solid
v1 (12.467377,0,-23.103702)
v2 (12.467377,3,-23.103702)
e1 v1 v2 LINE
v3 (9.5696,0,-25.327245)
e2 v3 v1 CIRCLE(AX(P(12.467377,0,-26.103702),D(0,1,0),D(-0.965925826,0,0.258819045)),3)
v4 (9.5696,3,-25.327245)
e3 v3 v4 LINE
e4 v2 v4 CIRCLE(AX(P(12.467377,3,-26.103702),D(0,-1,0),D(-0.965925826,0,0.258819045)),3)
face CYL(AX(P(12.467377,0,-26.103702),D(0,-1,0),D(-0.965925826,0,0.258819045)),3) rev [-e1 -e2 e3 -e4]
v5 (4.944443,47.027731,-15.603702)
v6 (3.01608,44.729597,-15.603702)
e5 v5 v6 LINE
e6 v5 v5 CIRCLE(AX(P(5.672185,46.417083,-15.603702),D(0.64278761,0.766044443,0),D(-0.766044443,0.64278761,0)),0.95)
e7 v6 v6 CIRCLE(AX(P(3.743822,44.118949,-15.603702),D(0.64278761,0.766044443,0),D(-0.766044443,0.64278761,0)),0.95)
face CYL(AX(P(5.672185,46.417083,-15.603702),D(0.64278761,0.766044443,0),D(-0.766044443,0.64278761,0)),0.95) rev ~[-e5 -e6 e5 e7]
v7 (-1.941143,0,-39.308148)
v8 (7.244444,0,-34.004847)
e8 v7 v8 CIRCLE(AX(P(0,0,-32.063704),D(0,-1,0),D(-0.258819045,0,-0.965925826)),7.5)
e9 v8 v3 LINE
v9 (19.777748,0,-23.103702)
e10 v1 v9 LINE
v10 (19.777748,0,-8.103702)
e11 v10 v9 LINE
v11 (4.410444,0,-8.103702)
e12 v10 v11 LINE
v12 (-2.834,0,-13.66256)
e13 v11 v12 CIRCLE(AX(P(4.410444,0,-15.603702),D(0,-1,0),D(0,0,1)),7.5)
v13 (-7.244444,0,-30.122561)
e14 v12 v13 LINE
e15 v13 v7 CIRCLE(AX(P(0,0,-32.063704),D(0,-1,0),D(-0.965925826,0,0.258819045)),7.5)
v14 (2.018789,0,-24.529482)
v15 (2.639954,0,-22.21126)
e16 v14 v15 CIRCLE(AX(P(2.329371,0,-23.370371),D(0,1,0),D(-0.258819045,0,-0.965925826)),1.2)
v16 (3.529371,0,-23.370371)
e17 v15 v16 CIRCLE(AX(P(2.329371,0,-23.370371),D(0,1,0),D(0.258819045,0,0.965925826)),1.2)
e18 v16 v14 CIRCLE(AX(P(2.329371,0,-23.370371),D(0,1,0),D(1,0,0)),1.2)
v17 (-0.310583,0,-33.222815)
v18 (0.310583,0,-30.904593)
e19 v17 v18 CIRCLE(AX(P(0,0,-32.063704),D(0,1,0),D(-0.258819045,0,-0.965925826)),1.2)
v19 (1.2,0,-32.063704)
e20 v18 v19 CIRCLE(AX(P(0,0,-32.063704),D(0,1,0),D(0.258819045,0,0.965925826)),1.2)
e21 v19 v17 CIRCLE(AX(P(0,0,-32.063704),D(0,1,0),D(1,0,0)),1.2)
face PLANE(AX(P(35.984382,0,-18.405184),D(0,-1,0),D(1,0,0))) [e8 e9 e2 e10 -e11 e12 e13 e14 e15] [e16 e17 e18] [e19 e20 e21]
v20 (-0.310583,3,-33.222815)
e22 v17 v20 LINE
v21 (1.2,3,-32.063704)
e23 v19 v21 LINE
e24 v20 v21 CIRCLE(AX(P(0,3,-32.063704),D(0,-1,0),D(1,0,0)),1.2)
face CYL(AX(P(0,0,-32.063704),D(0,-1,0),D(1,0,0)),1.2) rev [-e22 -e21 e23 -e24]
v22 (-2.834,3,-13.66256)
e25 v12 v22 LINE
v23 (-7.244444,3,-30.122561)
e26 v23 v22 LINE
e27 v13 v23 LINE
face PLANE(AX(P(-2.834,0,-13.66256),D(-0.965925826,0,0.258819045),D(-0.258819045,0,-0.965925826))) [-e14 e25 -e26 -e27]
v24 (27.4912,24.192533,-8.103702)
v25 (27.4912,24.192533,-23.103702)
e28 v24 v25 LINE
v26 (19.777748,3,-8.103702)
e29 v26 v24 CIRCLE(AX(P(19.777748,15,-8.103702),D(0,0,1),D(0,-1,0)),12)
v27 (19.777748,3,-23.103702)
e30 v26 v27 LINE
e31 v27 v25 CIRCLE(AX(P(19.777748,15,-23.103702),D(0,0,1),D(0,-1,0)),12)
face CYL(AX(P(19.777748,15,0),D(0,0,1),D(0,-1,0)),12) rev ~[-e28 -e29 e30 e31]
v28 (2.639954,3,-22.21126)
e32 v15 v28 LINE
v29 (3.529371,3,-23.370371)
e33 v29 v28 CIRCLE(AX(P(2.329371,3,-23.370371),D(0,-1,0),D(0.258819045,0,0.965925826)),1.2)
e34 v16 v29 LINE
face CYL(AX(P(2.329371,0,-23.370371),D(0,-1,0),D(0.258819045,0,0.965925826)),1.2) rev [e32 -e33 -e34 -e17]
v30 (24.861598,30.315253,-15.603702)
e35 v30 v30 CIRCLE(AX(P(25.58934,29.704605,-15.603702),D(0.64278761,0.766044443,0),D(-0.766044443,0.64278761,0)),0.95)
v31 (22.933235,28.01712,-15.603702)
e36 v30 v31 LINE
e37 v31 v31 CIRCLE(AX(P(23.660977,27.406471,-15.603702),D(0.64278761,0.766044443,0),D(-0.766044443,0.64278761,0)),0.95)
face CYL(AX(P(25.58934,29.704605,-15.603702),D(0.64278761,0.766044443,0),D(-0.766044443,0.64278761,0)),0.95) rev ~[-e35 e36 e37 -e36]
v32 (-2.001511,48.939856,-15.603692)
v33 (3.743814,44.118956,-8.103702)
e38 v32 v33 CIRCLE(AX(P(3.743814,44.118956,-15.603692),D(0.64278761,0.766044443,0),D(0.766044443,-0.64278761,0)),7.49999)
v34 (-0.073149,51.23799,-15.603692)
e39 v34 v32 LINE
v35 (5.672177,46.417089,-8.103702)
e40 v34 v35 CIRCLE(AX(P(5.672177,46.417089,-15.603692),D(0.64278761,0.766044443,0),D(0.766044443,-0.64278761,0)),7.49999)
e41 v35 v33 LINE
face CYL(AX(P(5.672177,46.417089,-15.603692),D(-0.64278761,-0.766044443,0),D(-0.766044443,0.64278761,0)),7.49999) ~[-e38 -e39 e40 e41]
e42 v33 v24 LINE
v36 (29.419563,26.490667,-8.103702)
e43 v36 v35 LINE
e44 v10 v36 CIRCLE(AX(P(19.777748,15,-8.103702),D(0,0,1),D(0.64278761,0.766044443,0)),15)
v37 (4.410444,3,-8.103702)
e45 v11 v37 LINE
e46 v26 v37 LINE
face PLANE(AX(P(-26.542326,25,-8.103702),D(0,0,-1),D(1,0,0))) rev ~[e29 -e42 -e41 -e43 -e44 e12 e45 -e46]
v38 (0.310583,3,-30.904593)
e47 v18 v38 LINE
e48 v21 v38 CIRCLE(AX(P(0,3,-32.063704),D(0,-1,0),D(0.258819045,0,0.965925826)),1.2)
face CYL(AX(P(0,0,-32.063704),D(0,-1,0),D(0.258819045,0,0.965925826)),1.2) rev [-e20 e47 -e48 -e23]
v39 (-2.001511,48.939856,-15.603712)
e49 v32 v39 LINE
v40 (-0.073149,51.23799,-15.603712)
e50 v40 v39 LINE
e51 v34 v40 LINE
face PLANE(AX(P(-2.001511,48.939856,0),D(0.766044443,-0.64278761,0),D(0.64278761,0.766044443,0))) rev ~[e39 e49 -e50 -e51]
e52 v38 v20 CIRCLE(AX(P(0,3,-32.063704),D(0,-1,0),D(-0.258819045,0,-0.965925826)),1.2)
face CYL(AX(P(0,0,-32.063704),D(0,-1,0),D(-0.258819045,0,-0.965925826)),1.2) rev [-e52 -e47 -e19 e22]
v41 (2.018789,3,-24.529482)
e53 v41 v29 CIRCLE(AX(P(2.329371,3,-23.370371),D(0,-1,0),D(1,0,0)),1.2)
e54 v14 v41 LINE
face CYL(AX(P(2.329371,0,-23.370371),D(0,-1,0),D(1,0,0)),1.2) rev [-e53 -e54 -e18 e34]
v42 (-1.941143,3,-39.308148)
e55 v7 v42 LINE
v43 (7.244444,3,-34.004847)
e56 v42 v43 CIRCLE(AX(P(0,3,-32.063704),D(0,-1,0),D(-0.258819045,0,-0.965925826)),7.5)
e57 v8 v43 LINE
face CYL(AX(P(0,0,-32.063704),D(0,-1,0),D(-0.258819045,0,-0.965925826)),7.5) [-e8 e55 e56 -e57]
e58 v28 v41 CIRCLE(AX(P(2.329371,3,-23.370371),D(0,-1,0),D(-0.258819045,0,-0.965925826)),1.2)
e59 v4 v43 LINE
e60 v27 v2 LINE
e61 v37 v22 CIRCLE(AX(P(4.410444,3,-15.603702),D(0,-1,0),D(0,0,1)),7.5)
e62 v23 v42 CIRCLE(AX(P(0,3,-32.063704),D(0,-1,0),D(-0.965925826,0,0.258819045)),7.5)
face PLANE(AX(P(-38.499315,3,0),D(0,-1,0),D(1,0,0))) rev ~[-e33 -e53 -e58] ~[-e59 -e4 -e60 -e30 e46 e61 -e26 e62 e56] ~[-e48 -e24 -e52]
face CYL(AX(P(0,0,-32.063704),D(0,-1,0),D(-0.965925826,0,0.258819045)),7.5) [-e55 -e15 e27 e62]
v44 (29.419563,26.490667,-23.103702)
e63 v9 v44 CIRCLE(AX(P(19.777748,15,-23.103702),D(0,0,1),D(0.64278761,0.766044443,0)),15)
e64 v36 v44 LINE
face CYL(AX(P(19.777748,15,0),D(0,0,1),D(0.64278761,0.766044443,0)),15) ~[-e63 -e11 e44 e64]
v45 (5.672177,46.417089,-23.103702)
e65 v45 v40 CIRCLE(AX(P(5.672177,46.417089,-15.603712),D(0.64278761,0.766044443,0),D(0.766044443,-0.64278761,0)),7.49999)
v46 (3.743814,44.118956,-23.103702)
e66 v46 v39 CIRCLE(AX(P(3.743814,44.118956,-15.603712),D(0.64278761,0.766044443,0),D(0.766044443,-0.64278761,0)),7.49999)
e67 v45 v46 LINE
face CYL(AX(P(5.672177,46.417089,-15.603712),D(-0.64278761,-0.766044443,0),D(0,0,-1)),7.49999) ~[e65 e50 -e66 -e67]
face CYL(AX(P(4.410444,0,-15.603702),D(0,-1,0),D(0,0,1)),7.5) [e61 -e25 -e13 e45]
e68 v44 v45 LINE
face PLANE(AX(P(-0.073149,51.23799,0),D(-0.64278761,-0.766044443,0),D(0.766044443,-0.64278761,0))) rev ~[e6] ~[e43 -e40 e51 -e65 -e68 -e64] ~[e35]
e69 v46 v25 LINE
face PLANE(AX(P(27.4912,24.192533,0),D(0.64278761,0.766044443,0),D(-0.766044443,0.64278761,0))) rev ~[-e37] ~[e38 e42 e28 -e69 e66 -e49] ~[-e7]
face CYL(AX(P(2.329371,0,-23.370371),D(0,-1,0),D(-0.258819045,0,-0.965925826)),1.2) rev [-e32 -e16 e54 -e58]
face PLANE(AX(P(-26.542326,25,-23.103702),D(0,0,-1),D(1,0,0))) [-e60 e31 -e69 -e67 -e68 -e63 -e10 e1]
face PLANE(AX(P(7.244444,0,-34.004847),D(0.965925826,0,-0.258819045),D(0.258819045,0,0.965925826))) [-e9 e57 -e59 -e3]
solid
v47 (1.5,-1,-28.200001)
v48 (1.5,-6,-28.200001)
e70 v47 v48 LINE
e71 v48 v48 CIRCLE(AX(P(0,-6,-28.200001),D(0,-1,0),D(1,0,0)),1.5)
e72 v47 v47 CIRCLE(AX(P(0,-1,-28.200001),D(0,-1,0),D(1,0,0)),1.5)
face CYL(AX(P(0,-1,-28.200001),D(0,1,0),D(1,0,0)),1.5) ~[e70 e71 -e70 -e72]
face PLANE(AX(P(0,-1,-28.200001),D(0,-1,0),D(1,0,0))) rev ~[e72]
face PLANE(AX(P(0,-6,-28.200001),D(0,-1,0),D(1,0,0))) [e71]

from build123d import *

# Parameters (mm, degrees)
F3_R      = 1.5
F4_DEPTH  = 5
F1_R      = 2.15
F5_DEPTH  = 25
F7_W      = 88.294127956
F7_H      = 15
F8_DEPTH  = 50
F0_W      = 181.6474571824
F0_H      = 159.0860895813
F9_DEPTH  = 39.5647038297
F10_R     = 0.95
F11_DEPTH = 5
F12_R     = 7.49999


# Not quite as in the source:
# - a fillet or chamfer is up to 0.001 mm smaller than in the source, because OpenCascade refuses the exact size


with BuildPart() as f4:
    # F3 (on offset) → F4 (new body)
    with BuildSketch(Plane.XZ.offset(1)):
        with Locations((0, -28.2000005245)):
            Circle(F3_R)
    extrude(amount=F4_DEPTH)


with BuildPart() as f5:
    # F1 (on Front) → F5 (new body)
    with BuildSketch(Plane.XZ):
        with BuildLine():
            ThreePointArc((-1.9411428383, -39.3081475268), (3.75, -38.5588943581), (7.2444436972, -34.0048466679))
            Line((7.2444436972, -34.0048466679), (9.5695999627, -25.3272453493))
            ThreePointArc((9.5695999627, -25.3272453493), (10.6410931546, -23.7236424637), (12.4673774416, -23.1037024846))
            Line((12.4673774416, -23.1037024846), (80.0844150527, -23.1037024846))
            ThreePointArc((80.0844150527, -23.1037024846), (87.5844150527, -15.6037024846), (80.0844150527, -8.1037024846))
            Line((80.0844150527, -8.1037024846), (49.0844150527, -8.1037024846))
            Line((49.0844150527, -8.1037024846), (19.777748386, -8.1037024846))
            Line((19.777748386, -8.1037024846), (4.4104440678, -8.1037024846))
            ThreePointArc((4.4104440678, -8.1037024846), (-0.1552666497, -9.6535524324), (-2.8339996293, -13.6625596463))
            Line((-2.8339996293, -13.6625596463), (-7.2444436972, -30.1225609914))
            ThreePointArc((-7.2444436972, -30.1225609914), (-6.4951905284, -35.8137038297), (-1.9411428383, -39.3081475268))
        make_face()
        with BuildLine():
            ThreePointArc((1.2, -32.0637038297), (0.7305137148, -33.015727838), (-0.3105828541, -33.2228148212))
            ThreePointArc((-0.3105828541, -33.2228148212), (-1.1591109915, -31.7531209756), (0.3105828541, -30.9045928381))
            ThreePointArc((0.3105828541, -30.9045928381), (0.9520240083, -31.3331901149), (1.2, -32.0637038297))
        make_face(mode=Mode.SUBTRACT)
        with BuildLine():
            ThreePointArc((3.5293714059, -23.3703713931), (3.0598851207, -24.3223954014), (2.0187885518, -24.5294823846))
            ThreePointArc((2.0187885518, -24.5294823846), (1.1702604144, -23.059788539), (2.63995426, -22.2112604015))
            ThreePointArc((2.63995426, -22.2112604015), (3.2813954143, -22.6398576783), (3.5293714059, -23.3703713931))
        make_face(mode=Mode.SUBTRACT)
        with Locations((54.0844150527, -15.6037024846)):
            Circle(F1_R, mode=Mode.SUBTRACT)
        with Locations((80.0844150527, -15.6037024846)):
            Circle(F1_R, mode=Mode.SUBTRACT)
    extrude(amount=-F5_DEPTH)

    # F7 (on offset) → F8 (join)
    with BuildSketch(Plane.XZ.offset(-25)):
        with Locations((17.6047375426, -15.6037024846)):
            Rectangle(F7_W, F7_H)
    extrude(amount=-F8_DEPTH)

    # F0 (on Top) → F9 (cut, through all)
    with BuildSketch(Plane.XY):
        with BuildLine():
            ThreePointArc((186.4293499082, 37.2767830718), (189.1206068421, 41.7118372377), (194.29723209, 41.3725432932))
            Line((194.29723209, 41.3725432932), (212.3185770643, 28.7538616935))
            Line((212.3185770643, 28.7538616935), (214.0393063734, 31.2113178264))
            Line((214.0393063734, 31.2113178264), (196.017961399, 43.8299994261))
            ThreePointArc((196.017961399, 43.8299994261), (187.7353610024, 44.3728697372), (183.4293499082, 37.2767830718))
            Line((183.4293499082, 37.2767830718), (183.4293499082, 8.5356936807))
            ThreePointArc((183.4293499082, 8.5356936807), (181.9648838142, 5.0001597747), (178.4293499082, 3.5356936807))
            Line((178.4293499082, 3.5356936807), (134.4964219123, 3.5356936807))
            Line((134.4964219123, 3.5356936807), (134.4964219123, 0.5356936807))
            Line((134.4964219123, 0.5356936807), (178.4293499082, 0.5356936807))
            ThreePointArc((178.4293499082, 0.5356936807), (184.0862041577, 2.8788394312), (186.4293499082, 8.5356936807))
            Line((186.4293499082, 8.5356936807), (186.4293499082, 37.2767830718))
        make_face()
        with Locations((32.1800746024, 51.0744024068)):
            Rectangle(F0_W, F0_H)
        with BuildLine():
            Line((19.777748386, 0), (0, 0))
            Line((0, 0), (-38.4993149038, 0))
            Line((-38.4993149038, 0), (-38.4993149038, 3))
            Line((-38.4993149038, 3), (0, 3))
            Line((0, 3), (19.777748386, 3))
            ThreePointArc((19.777748386, 3), (31.0540598354, 10.8957582801), (27.4911997022, 24.1925333174))
            Line((27.4911997022, 24.1925333174), (-2.0015113578, 48.9398562904))
            Line((-2.0015113578, 48.9398562904), (-0.0731485288, 51.2379896197))
            Line((-0.0731485288, 51.2379896197), (29.4195625313, 26.4906666468))
            ThreePointArc((29.4195625313, 26.4906666468), (33.8731376978, 9.8696978501), (19.777748386, 0))
        make_face(mode=Mode.SUBTRACT)
    extrude(amount=-F9_DEPTH, mode=Mode.SUBTRACT)

    # F10 (on face) → F11 (cut)
    with BuildSketch(Plane(origin=(25.1995615031, 30.0316679531, 0), x_dir=(-0.7660444431, 0.6427876097, 0), z_dir=(0.6427876097, 0.7660444431, 0))):
        with Locations((25.4911798968, -15.6037024846)):
            Circle(F10_R)
        with Locations((-0.5088201032, -15.6037024846)):
            Circle(F10_R)
    extrude(amount=-F11_DEPTH, mode=Mode.SUBTRACT)

    # F12 (radius 7.5 in the source; OpenCascade refuses exactly that, so slightly less here)
    f12_edges = [f5.edges().sort_by_distance(p)[0] for p in [
        (-1.03733, 50.088923, -8.103702),
        (-1.03733, 50.088923, -23.103702),
    ]]
    fillet(f12_edges, radius=F12_R)


solid = Compound([f4.part, f5.part])
